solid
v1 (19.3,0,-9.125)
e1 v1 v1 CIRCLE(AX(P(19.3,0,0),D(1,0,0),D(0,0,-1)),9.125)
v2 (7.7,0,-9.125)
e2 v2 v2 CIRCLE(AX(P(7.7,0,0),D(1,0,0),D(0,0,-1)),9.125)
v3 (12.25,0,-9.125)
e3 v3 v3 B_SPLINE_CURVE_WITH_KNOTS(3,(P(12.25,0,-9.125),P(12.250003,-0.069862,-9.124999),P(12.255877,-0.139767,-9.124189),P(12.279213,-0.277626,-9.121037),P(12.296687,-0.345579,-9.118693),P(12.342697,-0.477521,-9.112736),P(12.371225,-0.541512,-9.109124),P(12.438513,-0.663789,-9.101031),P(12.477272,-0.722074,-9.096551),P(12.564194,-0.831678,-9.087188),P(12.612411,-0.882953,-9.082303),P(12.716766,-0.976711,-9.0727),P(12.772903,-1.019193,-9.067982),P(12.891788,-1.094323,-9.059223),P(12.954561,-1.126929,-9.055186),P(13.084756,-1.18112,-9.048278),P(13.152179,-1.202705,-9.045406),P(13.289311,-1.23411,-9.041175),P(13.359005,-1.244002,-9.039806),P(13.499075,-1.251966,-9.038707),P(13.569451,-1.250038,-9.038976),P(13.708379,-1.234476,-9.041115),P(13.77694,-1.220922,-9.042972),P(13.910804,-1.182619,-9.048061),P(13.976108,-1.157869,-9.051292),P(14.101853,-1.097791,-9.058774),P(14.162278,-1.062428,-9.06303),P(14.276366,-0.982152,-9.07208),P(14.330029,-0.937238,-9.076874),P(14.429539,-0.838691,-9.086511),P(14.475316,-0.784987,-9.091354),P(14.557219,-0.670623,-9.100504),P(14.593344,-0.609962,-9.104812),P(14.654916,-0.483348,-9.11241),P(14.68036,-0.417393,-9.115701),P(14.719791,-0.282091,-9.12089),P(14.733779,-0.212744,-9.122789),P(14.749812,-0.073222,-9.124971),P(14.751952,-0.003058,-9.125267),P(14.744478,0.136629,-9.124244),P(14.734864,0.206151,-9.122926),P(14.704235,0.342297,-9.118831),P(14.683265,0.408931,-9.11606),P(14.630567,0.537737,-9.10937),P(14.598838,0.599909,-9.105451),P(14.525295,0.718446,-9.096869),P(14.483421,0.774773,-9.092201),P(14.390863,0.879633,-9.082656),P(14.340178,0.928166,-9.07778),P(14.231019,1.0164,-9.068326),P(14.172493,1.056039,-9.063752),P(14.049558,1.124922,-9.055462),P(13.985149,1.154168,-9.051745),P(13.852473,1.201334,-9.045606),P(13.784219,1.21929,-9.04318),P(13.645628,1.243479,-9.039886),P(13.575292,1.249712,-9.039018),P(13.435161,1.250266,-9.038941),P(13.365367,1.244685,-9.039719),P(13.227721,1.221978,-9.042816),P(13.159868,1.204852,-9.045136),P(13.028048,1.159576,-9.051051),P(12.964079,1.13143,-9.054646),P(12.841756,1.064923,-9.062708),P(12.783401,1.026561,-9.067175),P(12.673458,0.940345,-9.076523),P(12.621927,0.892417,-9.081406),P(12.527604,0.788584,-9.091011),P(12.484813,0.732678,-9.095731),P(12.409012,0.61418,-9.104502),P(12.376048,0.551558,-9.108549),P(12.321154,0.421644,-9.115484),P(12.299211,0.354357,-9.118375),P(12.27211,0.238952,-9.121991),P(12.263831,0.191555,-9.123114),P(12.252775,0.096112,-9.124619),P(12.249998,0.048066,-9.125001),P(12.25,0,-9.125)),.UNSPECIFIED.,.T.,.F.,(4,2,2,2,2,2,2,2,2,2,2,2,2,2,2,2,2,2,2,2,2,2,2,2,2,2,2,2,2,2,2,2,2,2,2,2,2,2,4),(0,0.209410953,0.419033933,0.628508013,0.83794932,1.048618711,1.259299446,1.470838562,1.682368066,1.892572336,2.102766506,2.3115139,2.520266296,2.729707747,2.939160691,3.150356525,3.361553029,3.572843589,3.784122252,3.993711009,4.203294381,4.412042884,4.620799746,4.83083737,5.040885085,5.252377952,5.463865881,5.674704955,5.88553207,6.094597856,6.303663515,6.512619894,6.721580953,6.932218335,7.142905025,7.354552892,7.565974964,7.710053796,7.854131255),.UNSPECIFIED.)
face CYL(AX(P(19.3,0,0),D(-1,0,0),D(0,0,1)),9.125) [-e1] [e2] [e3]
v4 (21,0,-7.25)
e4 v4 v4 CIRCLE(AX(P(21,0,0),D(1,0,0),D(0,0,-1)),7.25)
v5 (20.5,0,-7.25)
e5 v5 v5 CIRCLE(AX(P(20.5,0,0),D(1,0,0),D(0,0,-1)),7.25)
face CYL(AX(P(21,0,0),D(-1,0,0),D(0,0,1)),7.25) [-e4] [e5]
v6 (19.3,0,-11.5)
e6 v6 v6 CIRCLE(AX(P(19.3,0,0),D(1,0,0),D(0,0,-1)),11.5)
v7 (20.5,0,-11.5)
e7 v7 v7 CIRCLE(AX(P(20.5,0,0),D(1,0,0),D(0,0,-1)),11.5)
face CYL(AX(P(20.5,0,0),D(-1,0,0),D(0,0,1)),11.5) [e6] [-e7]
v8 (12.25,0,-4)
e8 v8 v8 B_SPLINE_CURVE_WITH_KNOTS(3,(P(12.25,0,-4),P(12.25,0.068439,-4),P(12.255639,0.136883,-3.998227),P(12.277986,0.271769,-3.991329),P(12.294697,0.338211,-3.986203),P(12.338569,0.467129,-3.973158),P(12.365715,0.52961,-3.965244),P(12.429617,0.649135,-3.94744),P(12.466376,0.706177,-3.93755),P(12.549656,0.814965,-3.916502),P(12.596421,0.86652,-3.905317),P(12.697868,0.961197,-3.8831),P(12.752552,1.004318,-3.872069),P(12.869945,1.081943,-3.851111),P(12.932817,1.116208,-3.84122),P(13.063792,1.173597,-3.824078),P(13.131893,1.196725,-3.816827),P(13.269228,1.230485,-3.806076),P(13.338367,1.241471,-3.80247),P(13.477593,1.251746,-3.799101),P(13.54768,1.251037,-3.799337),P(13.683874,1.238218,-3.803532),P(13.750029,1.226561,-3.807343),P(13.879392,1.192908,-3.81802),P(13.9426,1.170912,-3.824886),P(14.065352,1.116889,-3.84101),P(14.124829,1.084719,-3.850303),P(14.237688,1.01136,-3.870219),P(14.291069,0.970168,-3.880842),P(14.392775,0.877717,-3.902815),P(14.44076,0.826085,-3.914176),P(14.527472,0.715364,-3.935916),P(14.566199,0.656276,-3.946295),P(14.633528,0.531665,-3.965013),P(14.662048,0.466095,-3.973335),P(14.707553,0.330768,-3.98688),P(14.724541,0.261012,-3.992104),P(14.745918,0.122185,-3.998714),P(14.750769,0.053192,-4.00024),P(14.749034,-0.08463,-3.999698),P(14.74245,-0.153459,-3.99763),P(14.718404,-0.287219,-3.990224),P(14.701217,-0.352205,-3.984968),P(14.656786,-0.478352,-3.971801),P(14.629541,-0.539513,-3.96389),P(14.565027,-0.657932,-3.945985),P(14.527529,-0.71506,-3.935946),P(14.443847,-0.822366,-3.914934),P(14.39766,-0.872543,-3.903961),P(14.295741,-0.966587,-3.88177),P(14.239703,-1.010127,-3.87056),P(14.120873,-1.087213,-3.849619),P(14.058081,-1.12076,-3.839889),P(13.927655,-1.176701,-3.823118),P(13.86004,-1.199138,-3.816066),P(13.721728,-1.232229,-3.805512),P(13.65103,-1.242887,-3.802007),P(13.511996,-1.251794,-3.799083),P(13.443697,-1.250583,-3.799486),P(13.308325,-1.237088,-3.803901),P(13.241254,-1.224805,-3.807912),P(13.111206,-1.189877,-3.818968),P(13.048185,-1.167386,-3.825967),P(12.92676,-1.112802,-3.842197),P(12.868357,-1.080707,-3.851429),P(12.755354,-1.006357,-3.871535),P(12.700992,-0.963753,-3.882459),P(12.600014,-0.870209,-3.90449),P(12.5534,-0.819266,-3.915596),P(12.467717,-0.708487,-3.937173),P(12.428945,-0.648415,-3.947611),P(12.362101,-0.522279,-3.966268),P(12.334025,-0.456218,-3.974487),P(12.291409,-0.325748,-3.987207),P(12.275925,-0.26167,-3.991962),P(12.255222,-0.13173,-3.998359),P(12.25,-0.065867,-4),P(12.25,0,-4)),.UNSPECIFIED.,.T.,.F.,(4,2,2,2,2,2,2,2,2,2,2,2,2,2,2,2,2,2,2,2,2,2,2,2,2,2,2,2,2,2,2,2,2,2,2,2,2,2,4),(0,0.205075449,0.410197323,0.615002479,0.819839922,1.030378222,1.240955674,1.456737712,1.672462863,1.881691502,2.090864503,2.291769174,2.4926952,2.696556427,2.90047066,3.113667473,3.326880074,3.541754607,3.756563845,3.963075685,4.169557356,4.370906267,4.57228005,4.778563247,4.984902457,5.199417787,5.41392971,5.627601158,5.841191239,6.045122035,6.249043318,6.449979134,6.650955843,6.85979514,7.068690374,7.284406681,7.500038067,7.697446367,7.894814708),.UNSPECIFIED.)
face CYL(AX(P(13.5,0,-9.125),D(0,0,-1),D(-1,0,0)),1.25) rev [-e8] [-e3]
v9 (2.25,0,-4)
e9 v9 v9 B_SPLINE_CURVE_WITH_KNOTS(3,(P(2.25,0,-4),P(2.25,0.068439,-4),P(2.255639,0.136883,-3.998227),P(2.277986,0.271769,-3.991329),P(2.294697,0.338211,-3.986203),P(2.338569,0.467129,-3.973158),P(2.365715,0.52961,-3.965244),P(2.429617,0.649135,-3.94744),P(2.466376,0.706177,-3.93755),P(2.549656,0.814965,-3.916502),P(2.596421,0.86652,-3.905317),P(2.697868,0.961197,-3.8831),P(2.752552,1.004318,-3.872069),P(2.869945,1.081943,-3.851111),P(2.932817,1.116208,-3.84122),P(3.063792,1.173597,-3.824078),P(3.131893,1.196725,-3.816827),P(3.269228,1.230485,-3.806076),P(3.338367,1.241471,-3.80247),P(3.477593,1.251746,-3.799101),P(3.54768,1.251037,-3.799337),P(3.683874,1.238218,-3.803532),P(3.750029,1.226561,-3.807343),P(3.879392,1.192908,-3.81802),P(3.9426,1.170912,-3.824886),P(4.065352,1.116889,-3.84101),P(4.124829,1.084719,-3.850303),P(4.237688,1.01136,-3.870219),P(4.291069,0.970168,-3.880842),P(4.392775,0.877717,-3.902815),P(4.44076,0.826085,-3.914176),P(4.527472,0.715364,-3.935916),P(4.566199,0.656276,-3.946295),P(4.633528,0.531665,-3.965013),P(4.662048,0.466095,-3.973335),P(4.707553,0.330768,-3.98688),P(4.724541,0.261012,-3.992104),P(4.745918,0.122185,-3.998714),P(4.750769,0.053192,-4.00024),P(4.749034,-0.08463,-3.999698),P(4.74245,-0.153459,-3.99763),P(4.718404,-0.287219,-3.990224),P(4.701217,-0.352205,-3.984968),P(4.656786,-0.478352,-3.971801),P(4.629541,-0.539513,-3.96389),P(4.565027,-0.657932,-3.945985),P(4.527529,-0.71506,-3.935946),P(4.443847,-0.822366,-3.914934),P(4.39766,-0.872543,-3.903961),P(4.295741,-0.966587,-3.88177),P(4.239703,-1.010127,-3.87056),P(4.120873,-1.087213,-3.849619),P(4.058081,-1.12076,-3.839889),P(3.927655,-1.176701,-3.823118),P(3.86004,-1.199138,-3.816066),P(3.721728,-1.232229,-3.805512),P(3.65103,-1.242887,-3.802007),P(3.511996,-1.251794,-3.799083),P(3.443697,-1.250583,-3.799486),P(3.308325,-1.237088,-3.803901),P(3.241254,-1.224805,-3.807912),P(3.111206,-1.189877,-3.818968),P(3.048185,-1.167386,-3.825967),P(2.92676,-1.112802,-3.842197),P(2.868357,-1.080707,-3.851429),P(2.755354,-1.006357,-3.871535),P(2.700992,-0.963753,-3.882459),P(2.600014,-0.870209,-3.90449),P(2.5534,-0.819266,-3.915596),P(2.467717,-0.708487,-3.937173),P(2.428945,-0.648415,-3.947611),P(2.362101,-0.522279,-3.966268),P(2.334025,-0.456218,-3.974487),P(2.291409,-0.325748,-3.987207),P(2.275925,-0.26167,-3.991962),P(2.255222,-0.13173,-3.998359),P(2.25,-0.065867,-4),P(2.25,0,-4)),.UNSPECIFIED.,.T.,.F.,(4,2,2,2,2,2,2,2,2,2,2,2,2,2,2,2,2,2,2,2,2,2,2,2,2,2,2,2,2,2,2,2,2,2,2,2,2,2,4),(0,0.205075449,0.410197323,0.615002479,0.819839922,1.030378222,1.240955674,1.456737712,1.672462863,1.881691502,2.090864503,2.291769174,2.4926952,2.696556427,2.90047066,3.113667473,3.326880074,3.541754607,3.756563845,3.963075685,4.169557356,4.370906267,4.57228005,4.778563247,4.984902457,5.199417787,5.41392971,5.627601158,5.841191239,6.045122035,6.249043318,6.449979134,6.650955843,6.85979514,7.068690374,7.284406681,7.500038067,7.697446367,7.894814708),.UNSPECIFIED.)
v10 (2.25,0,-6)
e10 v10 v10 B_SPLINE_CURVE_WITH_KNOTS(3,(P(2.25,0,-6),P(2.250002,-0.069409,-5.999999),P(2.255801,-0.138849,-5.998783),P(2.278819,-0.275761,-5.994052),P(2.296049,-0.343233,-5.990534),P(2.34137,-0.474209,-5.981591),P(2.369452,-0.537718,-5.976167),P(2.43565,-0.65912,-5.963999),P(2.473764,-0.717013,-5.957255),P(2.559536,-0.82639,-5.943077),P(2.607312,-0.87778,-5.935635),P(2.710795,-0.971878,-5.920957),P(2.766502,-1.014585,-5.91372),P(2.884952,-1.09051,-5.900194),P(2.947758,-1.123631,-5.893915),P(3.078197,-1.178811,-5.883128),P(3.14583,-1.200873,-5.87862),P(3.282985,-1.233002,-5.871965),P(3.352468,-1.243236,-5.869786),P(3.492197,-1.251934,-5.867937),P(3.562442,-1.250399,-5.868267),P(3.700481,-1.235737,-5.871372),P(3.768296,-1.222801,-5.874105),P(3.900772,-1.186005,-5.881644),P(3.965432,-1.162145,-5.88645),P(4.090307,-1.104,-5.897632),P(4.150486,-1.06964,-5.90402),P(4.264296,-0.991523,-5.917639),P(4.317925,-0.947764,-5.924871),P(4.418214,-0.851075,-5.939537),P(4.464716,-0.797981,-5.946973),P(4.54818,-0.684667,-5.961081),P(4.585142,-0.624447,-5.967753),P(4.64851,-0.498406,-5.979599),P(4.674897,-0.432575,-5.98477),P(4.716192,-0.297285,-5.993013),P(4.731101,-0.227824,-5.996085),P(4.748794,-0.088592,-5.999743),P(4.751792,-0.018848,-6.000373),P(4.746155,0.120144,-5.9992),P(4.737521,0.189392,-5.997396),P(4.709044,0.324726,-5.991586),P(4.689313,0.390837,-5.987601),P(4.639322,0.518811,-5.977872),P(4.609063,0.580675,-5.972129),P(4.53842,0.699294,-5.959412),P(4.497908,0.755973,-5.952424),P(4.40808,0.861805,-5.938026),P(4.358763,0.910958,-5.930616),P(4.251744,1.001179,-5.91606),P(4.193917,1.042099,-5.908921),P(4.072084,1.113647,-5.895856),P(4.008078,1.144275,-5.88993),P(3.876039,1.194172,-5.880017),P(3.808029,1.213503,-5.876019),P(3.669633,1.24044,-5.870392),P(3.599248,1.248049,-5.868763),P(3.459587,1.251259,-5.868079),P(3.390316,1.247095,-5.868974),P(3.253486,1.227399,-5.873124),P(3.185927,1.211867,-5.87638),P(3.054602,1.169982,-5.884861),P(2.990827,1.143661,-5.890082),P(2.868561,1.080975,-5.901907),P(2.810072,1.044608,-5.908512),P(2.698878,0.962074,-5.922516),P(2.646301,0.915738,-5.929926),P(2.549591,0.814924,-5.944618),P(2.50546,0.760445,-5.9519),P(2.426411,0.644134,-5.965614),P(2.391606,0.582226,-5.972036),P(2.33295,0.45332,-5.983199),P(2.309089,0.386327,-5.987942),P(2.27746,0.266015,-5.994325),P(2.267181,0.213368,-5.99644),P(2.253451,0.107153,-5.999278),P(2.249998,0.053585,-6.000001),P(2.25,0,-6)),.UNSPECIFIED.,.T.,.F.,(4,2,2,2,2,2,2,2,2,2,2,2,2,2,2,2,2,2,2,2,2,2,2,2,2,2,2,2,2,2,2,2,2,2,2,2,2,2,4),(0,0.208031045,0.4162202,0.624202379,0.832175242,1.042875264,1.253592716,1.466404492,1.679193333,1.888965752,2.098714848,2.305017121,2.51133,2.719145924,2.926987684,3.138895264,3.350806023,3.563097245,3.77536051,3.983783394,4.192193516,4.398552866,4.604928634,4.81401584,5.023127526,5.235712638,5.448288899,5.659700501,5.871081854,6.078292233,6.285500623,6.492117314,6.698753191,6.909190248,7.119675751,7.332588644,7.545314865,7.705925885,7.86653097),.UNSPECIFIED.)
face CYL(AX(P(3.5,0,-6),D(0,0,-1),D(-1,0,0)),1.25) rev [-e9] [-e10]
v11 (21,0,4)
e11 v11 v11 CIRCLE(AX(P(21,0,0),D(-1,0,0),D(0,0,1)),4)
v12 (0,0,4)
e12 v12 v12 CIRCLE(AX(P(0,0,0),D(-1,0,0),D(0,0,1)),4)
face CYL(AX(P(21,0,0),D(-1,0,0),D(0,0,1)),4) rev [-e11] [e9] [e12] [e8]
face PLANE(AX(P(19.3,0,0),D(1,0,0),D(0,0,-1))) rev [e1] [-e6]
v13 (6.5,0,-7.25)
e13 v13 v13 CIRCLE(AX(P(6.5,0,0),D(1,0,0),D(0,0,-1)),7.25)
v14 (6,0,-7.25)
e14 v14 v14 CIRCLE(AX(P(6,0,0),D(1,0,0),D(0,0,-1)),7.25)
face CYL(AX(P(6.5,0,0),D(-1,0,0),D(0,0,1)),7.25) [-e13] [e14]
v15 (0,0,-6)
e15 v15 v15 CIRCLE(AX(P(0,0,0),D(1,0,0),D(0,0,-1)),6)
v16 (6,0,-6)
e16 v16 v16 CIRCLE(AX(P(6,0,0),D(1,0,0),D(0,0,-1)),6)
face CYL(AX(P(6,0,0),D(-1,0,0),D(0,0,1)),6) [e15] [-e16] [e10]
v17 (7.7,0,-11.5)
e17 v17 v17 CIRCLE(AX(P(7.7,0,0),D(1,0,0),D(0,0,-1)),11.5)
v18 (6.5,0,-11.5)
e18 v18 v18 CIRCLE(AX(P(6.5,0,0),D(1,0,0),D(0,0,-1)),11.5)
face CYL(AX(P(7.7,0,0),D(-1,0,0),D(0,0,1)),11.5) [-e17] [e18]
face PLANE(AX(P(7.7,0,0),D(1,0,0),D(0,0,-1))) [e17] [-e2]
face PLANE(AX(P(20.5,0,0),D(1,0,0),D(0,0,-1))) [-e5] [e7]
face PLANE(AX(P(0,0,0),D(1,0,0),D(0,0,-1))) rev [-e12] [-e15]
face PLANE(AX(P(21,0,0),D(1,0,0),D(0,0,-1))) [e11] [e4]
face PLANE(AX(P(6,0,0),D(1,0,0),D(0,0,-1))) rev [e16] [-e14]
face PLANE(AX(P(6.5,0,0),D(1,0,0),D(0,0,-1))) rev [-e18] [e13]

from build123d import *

# Parameters (mm, degrees)
CROQUIS1_R                    = 6
SALIENTE_EXTRUIR1_DEPTH       = 6
CROQUIS2_R                    = 7.25
SALIENTE_EXTRUIR2_DEPTH       = 0.5
CROQUIS3_R                    = 11.5
SALIENTE_EXTRUIR3_DEPTH       = 1.2
CROQUIS4_R                    = 9.125
SALIENTE_EXTRUIR4_DEPTH       = 11.6
CROQUIS5_R                    = 11.5
SALIENTE_EXTRUIR5_DEPTH       = 1.2
CROQUIS6_R                    = 7.25
SALIENTE_EXTRUIR6_DEPTH       = 0.5
CROQUIS7_R                    = 4
CORTAR_EXTRUIR1_DEPTH         = 27.561249971
TALADRO_ROSCADO_M32_D         = 2.5
TALADRO_ROSCADO_M32_DEPTH     = 8.5
TALADRO_ROSCADO_M32_TIP       = 0.751075774
TALADRO_ROSCADO_M33_OUTLINE_W = 1.25
TALADRO_ROSCADO_M33_OUTLINE_H = 5.325356109


# Read off the part's stored shape, not the designer's step: Taladro roscado M33
with BuildPart() as part:
    # Croquis1 → Saliente-Extruir1 (new body)
    with BuildSketch(Plane(origin=(0, 0, 0), x_dir=(0, 0, -1), z_dir=(1, 0, 0))):
        Circle(CROQUIS1_R)
    extrude(amount=SALIENTE_EXTRUIR1_DEPTH)

    # Croquis2 → Saliente-Extruir2 (add)
    with BuildSketch(Plane(origin=(6, 0, 0), x_dir=(0, 0, -1), z_dir=(1, 0, 0))):
        Circle(CROQUIS2_R)
    extrude(amount=SALIENTE_EXTRUIR2_DEPTH)

    # Croquis3 → Saliente-Extruir3 (add)
    with BuildSketch(Plane(origin=(6.5, 0, 0), x_dir=(0, 0, -1), z_dir=(1, 0, 0))):
        Circle(CROQUIS3_R)
    extrude(amount=SALIENTE_EXTRUIR3_DEPTH)

    # Croquis4 → Saliente-Extruir4 (add)
    with BuildSketch(Plane(origin=(7.7, 0, 0), x_dir=(0, 0, -1), z_dir=(1, 0, 0))):
        Circle(CROQUIS4_R)
    extrude(amount=SALIENTE_EXTRUIR4_DEPTH)

    # Croquis5 → Saliente-Extruir5 (add)
    with BuildSketch(Plane(origin=(19.3, 0, 0), x_dir=(0, 0, -1), z_dir=(1, 0, 0))):
        Circle(CROQUIS5_R)
    extrude(amount=SALIENTE_EXTRUIR5_DEPTH)

    # Croquis6 → Saliente-Extruir6 (add)
    with BuildSketch(Plane(origin=(20.5, 0, 0), x_dir=(0, 0, -1), z_dir=(1, 0, 0))):
        Circle(CROQUIS6_R)
    extrude(amount=SALIENTE_EXTRUIR6_DEPTH)

    # Croquis7 → Cortar-Extruir1 (cut, through all)
    with BuildSketch(Plane.ZY):
        Circle(CROQUIS7_R)
    extrude(amount=-CORTAR_EXTRUIR1_DEPTH, mode=Mode.SUBTRACT)

    # Taladro roscado M32
    with Locations(Plane(origin=(0, 0, -6), x_dir=(-1, 0, 0), z_dir=(0, 0, -1))):
        with Locations((-3.5, 0)):
            Hole(TALADRO_ROSCADO_M32_D / 2, depth=TALADRO_ROSCADO_M32_DEPTH)
            with Locations((0, 0, -(TALADRO_ROSCADO_M32_DEPTH + TALADRO_ROSCADO_M32_TIP / 2))):  # 118° drill point
                Cone(0, TALADRO_ROSCADO_M32_D / 2, TALADRO_ROSCADO_M32_TIP, mode=Mode.SUBTRACT)

    # Taladro roscado M33 outline → Taladro roscado M33 (revolve, cut)
    with BuildSketch(Plane(origin=(13.5, 0, 0), x_dir=(1, 0, 0), z_dir=(0, -1, 0))):
        with Locations((0.625, -6.462322169)):
            Rectangle(TALADRO_ROSCADO_M33_OUTLINE_W, TALADRO_ROSCADO_M33_OUTLINE_H)
    revolve(axis=Axis((13.5, 0, 0), (0, 0, 1)), mode=Mode.SUBTRACT)


solid = part.part
